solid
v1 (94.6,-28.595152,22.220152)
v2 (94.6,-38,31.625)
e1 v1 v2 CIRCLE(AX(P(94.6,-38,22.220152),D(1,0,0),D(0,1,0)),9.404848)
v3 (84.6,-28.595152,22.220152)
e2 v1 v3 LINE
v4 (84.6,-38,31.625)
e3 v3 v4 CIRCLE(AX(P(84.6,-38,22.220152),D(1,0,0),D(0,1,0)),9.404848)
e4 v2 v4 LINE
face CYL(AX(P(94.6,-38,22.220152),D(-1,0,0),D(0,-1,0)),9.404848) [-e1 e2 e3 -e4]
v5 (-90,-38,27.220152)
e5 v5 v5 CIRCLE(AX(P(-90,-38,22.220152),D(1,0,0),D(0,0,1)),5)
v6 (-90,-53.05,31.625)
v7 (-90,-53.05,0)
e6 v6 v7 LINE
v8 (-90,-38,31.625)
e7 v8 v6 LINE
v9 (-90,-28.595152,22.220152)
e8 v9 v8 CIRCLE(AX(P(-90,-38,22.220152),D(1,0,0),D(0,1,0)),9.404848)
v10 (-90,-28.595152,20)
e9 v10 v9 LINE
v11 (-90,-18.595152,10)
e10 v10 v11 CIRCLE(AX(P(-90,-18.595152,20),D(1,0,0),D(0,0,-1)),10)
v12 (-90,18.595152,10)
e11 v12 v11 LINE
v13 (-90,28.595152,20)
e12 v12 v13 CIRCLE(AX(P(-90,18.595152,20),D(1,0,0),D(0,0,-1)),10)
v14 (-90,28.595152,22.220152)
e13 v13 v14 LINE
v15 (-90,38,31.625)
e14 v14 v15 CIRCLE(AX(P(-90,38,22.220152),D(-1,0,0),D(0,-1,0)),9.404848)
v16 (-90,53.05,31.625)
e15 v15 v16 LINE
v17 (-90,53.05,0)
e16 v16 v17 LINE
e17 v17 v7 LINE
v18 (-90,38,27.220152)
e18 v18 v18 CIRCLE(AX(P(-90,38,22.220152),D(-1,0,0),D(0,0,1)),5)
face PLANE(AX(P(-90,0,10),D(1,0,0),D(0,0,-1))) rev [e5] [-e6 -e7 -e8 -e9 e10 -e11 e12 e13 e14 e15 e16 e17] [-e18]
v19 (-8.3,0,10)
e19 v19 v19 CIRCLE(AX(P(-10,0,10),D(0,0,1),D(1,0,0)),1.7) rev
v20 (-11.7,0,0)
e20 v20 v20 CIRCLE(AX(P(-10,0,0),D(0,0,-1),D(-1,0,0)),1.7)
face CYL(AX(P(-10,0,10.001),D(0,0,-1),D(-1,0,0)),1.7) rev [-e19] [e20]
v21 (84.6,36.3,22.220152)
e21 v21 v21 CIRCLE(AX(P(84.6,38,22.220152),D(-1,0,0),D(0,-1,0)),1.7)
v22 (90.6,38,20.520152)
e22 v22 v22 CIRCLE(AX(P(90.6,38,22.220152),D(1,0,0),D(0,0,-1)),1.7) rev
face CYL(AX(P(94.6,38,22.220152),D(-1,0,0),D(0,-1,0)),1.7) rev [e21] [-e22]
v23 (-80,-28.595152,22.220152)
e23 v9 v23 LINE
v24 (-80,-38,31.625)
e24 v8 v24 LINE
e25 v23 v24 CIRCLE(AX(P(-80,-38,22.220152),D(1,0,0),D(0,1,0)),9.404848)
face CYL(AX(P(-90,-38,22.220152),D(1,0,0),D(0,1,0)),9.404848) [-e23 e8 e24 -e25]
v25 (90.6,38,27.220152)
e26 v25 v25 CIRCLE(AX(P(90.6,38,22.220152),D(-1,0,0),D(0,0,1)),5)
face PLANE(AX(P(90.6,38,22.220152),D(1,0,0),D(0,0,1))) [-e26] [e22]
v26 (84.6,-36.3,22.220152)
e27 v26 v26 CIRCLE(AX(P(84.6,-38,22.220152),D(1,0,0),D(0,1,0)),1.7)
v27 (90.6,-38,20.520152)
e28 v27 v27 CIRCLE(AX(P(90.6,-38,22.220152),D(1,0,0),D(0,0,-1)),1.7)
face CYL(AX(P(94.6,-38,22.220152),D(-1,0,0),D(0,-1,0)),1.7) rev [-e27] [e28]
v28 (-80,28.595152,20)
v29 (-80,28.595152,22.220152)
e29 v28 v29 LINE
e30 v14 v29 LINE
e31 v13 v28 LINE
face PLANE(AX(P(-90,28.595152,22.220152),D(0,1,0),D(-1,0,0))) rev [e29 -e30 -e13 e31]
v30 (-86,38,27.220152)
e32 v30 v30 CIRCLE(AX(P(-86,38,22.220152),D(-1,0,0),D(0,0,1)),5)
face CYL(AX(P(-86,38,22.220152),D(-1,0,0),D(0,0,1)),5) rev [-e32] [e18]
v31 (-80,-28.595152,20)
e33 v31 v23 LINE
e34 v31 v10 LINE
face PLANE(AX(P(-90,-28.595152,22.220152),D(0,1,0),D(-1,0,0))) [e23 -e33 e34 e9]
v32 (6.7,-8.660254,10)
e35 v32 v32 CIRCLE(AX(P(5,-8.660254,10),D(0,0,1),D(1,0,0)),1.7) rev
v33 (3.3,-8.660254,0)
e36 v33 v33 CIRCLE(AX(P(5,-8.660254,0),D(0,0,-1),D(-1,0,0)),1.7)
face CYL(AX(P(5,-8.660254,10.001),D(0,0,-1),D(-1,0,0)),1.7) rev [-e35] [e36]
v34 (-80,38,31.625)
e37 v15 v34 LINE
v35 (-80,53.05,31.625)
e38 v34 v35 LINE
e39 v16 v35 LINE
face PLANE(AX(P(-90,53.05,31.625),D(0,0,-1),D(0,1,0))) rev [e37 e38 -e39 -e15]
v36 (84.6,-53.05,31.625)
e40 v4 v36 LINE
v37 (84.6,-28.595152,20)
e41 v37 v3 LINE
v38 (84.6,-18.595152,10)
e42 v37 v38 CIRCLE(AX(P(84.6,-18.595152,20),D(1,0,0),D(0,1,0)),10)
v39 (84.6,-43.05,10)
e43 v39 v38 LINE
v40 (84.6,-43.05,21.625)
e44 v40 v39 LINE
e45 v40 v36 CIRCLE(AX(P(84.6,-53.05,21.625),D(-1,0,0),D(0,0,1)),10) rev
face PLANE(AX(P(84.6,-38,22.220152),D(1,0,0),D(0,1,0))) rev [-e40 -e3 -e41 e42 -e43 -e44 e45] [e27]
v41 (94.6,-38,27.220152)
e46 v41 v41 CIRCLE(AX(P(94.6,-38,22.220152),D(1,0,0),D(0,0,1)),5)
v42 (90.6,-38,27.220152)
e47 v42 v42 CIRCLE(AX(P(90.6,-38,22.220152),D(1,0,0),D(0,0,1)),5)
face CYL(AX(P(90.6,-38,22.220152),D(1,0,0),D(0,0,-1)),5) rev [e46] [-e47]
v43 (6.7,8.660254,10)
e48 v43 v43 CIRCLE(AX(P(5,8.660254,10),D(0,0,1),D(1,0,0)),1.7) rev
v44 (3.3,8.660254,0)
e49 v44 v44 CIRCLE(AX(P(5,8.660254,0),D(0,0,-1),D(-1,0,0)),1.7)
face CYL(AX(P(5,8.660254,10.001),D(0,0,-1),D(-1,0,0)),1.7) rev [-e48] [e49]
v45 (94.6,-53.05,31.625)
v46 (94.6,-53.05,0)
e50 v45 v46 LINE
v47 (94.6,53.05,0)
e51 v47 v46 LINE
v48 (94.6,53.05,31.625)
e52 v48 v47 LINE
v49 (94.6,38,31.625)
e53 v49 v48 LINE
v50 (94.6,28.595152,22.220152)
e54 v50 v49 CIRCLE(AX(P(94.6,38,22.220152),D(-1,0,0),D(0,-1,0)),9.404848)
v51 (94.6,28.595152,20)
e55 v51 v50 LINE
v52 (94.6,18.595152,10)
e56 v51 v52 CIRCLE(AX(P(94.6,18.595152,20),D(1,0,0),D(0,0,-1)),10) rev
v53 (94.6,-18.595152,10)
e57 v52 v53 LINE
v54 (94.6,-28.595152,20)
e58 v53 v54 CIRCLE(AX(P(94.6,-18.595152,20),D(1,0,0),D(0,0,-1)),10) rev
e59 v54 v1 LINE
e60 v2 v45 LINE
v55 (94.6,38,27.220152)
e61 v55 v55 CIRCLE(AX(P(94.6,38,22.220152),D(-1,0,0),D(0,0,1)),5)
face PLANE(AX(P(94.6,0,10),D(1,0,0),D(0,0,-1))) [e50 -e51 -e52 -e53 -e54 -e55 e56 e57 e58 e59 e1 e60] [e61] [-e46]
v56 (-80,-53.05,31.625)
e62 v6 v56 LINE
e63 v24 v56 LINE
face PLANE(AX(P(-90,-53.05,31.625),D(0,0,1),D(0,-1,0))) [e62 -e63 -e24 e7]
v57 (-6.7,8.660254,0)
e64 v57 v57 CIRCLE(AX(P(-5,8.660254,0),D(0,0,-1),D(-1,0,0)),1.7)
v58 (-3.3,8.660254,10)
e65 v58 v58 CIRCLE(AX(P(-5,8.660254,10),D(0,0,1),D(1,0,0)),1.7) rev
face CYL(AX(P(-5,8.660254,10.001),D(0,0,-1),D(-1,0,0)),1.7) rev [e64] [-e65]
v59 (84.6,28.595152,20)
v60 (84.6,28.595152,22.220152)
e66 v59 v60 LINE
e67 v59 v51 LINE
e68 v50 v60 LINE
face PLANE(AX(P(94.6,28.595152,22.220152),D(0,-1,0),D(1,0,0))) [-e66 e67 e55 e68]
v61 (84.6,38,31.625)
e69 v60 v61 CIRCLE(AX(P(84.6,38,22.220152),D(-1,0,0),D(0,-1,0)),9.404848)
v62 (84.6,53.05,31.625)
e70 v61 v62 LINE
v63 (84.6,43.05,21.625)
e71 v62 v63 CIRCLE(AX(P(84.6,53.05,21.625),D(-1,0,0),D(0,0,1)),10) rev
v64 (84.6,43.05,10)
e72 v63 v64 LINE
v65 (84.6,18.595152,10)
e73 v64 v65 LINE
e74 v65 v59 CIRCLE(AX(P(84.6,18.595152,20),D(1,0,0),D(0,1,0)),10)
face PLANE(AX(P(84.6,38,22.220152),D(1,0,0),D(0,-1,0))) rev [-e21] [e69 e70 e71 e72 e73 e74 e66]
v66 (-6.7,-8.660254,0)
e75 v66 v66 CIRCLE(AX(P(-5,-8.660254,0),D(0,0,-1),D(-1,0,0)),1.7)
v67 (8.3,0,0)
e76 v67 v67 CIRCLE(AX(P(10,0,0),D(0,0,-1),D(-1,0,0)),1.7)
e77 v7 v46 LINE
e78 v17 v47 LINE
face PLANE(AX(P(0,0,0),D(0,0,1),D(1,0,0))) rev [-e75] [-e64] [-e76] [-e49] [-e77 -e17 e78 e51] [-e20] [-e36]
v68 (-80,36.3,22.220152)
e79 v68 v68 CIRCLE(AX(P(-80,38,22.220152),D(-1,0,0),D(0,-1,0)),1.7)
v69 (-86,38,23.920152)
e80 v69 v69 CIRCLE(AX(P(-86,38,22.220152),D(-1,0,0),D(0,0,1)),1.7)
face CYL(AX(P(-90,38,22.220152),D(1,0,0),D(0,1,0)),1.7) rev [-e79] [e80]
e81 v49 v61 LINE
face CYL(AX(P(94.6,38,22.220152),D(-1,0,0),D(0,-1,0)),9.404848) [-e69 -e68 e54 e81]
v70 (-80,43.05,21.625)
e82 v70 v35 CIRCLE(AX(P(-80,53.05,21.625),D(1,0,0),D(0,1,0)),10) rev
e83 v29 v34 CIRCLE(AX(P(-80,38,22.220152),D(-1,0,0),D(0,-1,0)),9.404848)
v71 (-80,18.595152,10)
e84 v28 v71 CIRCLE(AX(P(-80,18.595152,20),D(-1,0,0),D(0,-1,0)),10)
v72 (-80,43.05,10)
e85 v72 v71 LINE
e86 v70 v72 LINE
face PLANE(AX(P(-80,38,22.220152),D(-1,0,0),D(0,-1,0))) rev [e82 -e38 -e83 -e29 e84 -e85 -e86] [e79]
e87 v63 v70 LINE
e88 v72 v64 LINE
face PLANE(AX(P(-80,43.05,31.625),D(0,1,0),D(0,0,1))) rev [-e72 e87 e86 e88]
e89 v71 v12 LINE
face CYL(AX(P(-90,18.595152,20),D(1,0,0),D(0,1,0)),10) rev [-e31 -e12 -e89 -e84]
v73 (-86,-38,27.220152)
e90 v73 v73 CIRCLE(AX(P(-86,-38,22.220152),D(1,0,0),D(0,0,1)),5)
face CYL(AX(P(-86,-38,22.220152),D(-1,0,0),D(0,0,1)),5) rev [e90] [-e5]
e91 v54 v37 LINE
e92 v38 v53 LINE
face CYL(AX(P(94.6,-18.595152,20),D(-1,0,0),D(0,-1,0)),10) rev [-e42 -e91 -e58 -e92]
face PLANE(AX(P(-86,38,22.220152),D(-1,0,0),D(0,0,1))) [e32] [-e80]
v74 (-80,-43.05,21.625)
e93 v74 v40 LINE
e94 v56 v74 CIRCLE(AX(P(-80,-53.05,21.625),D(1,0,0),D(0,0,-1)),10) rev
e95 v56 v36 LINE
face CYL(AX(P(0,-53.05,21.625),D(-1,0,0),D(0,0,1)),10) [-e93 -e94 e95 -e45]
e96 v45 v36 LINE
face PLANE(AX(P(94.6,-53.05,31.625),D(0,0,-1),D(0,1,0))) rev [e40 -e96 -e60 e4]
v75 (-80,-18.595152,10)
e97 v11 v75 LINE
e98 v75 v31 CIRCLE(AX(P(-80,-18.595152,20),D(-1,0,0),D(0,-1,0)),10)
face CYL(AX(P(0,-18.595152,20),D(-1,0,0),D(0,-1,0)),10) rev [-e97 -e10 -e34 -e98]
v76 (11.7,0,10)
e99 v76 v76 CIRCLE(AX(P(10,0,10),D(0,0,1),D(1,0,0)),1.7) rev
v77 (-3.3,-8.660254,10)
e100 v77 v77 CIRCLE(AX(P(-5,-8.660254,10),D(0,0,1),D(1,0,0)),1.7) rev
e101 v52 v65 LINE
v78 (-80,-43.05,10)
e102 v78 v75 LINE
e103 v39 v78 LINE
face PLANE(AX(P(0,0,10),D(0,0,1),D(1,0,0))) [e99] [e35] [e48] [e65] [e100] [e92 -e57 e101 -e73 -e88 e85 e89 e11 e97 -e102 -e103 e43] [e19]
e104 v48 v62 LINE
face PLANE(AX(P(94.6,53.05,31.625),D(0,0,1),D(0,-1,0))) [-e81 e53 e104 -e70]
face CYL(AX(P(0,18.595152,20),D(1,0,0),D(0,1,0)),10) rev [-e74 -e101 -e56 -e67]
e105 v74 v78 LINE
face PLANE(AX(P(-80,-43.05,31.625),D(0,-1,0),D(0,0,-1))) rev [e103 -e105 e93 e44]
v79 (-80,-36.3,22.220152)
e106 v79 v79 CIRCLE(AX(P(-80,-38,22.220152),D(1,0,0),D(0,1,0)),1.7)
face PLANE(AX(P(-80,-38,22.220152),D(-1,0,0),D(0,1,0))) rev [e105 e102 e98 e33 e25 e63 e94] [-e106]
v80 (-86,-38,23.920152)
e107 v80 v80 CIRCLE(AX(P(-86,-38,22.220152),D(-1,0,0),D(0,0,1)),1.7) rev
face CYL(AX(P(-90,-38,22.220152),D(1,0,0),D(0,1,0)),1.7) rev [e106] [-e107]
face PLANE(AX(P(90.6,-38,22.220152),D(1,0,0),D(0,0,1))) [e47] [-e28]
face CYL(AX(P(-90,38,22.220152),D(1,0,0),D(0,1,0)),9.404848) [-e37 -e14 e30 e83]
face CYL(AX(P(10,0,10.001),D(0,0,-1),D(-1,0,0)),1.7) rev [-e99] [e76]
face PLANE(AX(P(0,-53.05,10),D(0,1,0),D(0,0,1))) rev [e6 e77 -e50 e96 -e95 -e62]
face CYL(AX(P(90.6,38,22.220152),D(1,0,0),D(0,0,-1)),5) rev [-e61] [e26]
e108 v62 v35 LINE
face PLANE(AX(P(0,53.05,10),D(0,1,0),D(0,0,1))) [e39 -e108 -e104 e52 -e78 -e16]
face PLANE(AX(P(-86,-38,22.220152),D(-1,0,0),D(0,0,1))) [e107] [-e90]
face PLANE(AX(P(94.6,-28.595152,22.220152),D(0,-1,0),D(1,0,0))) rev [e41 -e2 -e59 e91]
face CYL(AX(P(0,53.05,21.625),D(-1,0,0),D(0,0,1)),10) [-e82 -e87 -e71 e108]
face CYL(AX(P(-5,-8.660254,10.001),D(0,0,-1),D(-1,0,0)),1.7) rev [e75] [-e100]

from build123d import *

# Parameters (mm, degrees)
SKETCH1_W             = 184.6
SKETCH1_H             = 106.1
BOSS_EXTRUDE1_DEPTH   = 10
CUT_EXTRUDE2_REACH    = 110.92
SKETCH7_R             = 1.7
SKETCH3_W             = 164.6
SKETCH3_H             = 10
BOSS_EXTRUDE2_DEPTH   = 21.625
FILLET1_R             = 10
SKETCH5_R             = 1.7
BOSS_EXTRUDE3_DEPTH   = 10
SKETCH6_R             = 5
CUT_EXTRUDE1_DEPTH    = 4
FILLET2_R             = 10
FILLET2_OF_MIRROR1_R  = 10
MIRROR2_START         = 84.6
MIRROR2_OUTLINE_R     = 5
MIRROR2_DEPTH         = 10
MIRROR2_2_OUTLINE_R   = 5
MIRROR2_2_OUTLINE_R_2 = 1.7
MIRROR2_2_DEPTH       = 6


# Read off the part's stored shape, not the designer's step: Mirror2
with BuildPart() as part:
    # Sketch1 → Boss-Extrude1 (new body)
    with BuildSketch(Plane.XY):
        with Locations((2.3, 0)):
            Rectangle(SKETCH1_W, SKETCH1_H)
    extrude(amount=BOSS_EXTRUDE1_DEPTH)

    # Sketch7 → Cut-Extrude2 (cut, up to next)
    with BuildSketch(Plane(origin=(0, 0, 0), x_dir=(-1, 0, 0), z_dir=(0, 0, -1)), mode=Mode.PRIVATE) as cut_extrude2_sk1:
        with Locations((-10, 0)):
            Circle(SKETCH7_R)
    cut_extrude2_tool1 = extrude(cut_extrude2_sk1.sketch, amount=-CUT_EXTRUDE2_REACH, mode=Mode.PRIVATE) & part.part
    # Sketch7 → Cut-Extrude2 (cut, up to next)
    with BuildSketch(Plane(origin=(0, 0, 0), x_dir=(-1, 0, 0), z_dir=(0, 0, -1)), mode=Mode.PRIVATE) as cut_extrude2_sk2:
        with Locations((-5, 8.660254038)):
            Circle(SKETCH7_R)
    cut_extrude2_tool2 = extrude(cut_extrude2_sk2.sketch, amount=-CUT_EXTRUDE2_REACH, mode=Mode.PRIVATE) & part.part
    # Sketch7 → Cut-Extrude2 (cut, up to next)
    with BuildSketch(Plane(origin=(0, 0, 0), x_dir=(-1, 0, 0), z_dir=(0, 0, -1)), mode=Mode.PRIVATE) as cut_extrude2_sk3:
        with Locations((5, 8.660254038)):
            Circle(SKETCH7_R)
    cut_extrude2_tool3 = extrude(cut_extrude2_sk3.sketch, amount=-CUT_EXTRUDE2_REACH, mode=Mode.PRIVATE) & part.part
    # Sketch7 → Cut-Extrude2 (cut, up to next)
    with BuildSketch(Plane(origin=(0, 0, 0), x_dir=(-1, 0, 0), z_dir=(0, 0, -1)), mode=Mode.PRIVATE) as cut_extrude2_sk4:
        with Locations((10, 0)):
            Circle(SKETCH7_R)
    cut_extrude2_tool4 = extrude(cut_extrude2_sk4.sketch, amount=-CUT_EXTRUDE2_REACH, mode=Mode.PRIVATE) & part.part
    # Sketch7 → Cut-Extrude2 (cut, up to next)
    with BuildSketch(Plane(origin=(0, 0, 0), x_dir=(-1, 0, 0), z_dir=(0, 0, -1)), mode=Mode.PRIVATE) as cut_extrude2_sk5:
        with Locations((5, -8.660254038)):
            Circle(SKETCH7_R)
    cut_extrude2_tool5 = extrude(cut_extrude2_sk5.sketch, amount=-CUT_EXTRUDE2_REACH, mode=Mode.PRIVATE) & part.part
    # Sketch7 → Cut-Extrude2 (cut, up to next)
    with BuildSketch(Plane(origin=(0, 0, 0), x_dir=(-1, 0, 0), z_dir=(0, 0, -1)), mode=Mode.PRIVATE) as cut_extrude2_sk6:
        with Locations((-5, -8.660254038)):
            Circle(SKETCH7_R)
    cut_extrude2_tool6 = extrude(cut_extrude2_sk6.sketch, amount=-CUT_EXTRUDE2_REACH, mode=Mode.PRIVATE) & part.part
    add(cut_extrude2_tool1.solids().sort_by_distance((10, 0, 0))[0], mode=Mode.SUBTRACT)
    add(cut_extrude2_tool2.solids().sort_by_distance((5, 8.660254, 0))[0], mode=Mode.SUBTRACT)
    add(cut_extrude2_tool3.solids().sort_by_distance((-5, 8.660254, 0))[0], mode=Mode.SUBTRACT)
    add(cut_extrude2_tool4.solids().sort_by_distance((-10, 0, 0))[0], mode=Mode.SUBTRACT)
    add(cut_extrude2_tool5.solids().sort_by_distance((-5, -8.660254, 0))[0], mode=Mode.SUBTRACT)
    add(cut_extrude2_tool6.solids().sort_by_distance((5, -8.660254, 0))[0], mode=Mode.SUBTRACT)

    # Sketch3 → Boss-Extrude2 (add)
    with BuildSketch(Plane.XY.offset(10)):
        with Locations((2.3, 48.05)):
            Rectangle(SKETCH3_W, SKETCH3_H)
        with Locations((2.3, -48.05)):
            Rectangle(SKETCH3_W, SKETCH3_H)
    extrude(amount=BOSS_EXTRUDE2_DEPTH)

    # Fillet1
    fillet1_edges = [part.edges().sort_by_distance(p)[0] for p in [
        (2.3, 43.05, 31.625),
        (2.3, -43.05, 31.625),
    ]]
    fillet(fillet1_edges, radius=FILLET1_R - 0.0001)  # a hair under: the kernel refuses the full size

    # Sketch5 → Boss-Extrude3 (add)
    with BuildSketch(Plane.ZY.offset(80)):
        with BuildLine():
            Line((31.625, 53.05), (31.625, 38))
            ThreePointArc((31.625, 38), (28.870383682, 31.349767926), (22.220151608, 28.595151608))
            Line((22.220151608, 28.595151608), (10, 28.595151608))
            Line((10, 28.595151608), (10, 53.05))
            Line((10, 53.05), (31.625, 53.05))
        make_face()
        with Locations(Location((22.220151608, 38, 0), (0, 0, 270))):
            Circle(SKETCH5_R, mode=Mode.SUBTRACT)
    boss_extrude3 = extrude(amount=BOSS_EXTRUDE3_DEPTH)

    # Sketch6 → Cut-Extrude1 (cut)
    with BuildSketch(Plane.ZY.offset(90)):
        with Locations((22.220151608, 38)):
            Circle(SKETCH6_R)
    cut_extrude1 = extrude(amount=-CUT_EXTRUDE1_DEPTH, mode=Mode.SUBTRACT)

    # Fillet2
    fillet2_edges = [part.edges().sort_by_distance(p)[0] for p in [
        (-85, 28.595151608, 10),
    ]]
    fillet(fillet2_edges, radius=FILLET2_R)

    # Mirror1: Boss-Extrude3, Cut-Extrude1 across plane
    add(boss_extrude3.mirror(Plane.ZX))
    add(cut_extrude1.mirror(Plane.ZX), mode=Mode.SUBTRACT)

    # Fillet2 of Mirror1
    fillet2_of_mirror1_edges = [part.edges().sort_by_distance(p)[0] for p in [
        (-85, -28.595151608, 10),
    ]]
    fillet(fillet2_of_mirror1_edges, radius=FILLET2_OF_MIRROR1_R)

    # Mirror2 outline → Mirror2 (add)
    # profile 1 of 2: a face of its own
    with BuildSketch(Plane.YZ.offset(MIRROR2_START)):
        with BuildLine():
            ThreePointArc((38, 31.625), (31.349767926, 28.870383682), (28.595151608, 22.220151608))
            Line((28.595151608, 22.220151608), (28.595151608, 20))
            ThreePointArc((28.595151608, 20), (25.66621942, 12.928932188), (18.595151608, 10))
            Line((18.595151608, 10), (53.05, 10))
            Line((53.05, 10), (53.05, 31.625))
            Line((53.05, 31.625), (38, 31.625))
        make_face()
        with Locations((38, 22.220151608)):
            Circle(MIRROR2_OUTLINE_R, mode=Mode.SUBTRACT)
    # profile 2 of 2: a face of its own
    with BuildSketch(Plane.YZ.offset(MIRROR2_START)):
        with BuildLine():
            Line((-53.05, 10), (-18.595151608, 10))
            ThreePointArc((-18.595151608, 10), (-25.66621942, 12.928932188), (-28.595151608, 20))
            Line((-28.595151608, 20), (-28.595151608, 22.220151608))
            ThreePointArc((-28.595151608, 22.220151608), (-31.349767926, 28.870383682), (-38, 31.625))
            Line((-38, 31.625), (-53.05, 31.625))
            Line((-53.05, 31.625), (-53.05, 10))
        make_face()
        with Locations((-38, 22.220151608)):
            Circle(MIRROR2_OUTLINE_R, mode=Mode.SUBTRACT)
    extrude(amount=MIRROR2_DEPTH)

    # Mirror2 2 outline → Mirror2 2 (add)
    # profile 1 of 2: a face of its own
    with BuildSketch(Plane.YZ.offset(MIRROR2_START)):
        with Locations((38, 22.220151608)):
            Circle(MIRROR2_2_OUTLINE_R)
        with Locations((38, 22.220151608)):
            Circle(MIRROR2_2_OUTLINE_R_2, mode=Mode.SUBTRACT)
    # profile 2 of 2: a face of its own
    with BuildSketch(Plane.YZ.offset(MIRROR2_START)):
        with Locations((-38, 22.220151608)):
            Circle(MIRROR2_2_OUTLINE_R)
        with Locations((-38, 22.220151608)):
            Circle(MIRROR2_2_OUTLINE_R_2, mode=Mode.SUBTRACT)
    extrude(amount=MIRROR2_2_DEPTH)


solid = part.part
